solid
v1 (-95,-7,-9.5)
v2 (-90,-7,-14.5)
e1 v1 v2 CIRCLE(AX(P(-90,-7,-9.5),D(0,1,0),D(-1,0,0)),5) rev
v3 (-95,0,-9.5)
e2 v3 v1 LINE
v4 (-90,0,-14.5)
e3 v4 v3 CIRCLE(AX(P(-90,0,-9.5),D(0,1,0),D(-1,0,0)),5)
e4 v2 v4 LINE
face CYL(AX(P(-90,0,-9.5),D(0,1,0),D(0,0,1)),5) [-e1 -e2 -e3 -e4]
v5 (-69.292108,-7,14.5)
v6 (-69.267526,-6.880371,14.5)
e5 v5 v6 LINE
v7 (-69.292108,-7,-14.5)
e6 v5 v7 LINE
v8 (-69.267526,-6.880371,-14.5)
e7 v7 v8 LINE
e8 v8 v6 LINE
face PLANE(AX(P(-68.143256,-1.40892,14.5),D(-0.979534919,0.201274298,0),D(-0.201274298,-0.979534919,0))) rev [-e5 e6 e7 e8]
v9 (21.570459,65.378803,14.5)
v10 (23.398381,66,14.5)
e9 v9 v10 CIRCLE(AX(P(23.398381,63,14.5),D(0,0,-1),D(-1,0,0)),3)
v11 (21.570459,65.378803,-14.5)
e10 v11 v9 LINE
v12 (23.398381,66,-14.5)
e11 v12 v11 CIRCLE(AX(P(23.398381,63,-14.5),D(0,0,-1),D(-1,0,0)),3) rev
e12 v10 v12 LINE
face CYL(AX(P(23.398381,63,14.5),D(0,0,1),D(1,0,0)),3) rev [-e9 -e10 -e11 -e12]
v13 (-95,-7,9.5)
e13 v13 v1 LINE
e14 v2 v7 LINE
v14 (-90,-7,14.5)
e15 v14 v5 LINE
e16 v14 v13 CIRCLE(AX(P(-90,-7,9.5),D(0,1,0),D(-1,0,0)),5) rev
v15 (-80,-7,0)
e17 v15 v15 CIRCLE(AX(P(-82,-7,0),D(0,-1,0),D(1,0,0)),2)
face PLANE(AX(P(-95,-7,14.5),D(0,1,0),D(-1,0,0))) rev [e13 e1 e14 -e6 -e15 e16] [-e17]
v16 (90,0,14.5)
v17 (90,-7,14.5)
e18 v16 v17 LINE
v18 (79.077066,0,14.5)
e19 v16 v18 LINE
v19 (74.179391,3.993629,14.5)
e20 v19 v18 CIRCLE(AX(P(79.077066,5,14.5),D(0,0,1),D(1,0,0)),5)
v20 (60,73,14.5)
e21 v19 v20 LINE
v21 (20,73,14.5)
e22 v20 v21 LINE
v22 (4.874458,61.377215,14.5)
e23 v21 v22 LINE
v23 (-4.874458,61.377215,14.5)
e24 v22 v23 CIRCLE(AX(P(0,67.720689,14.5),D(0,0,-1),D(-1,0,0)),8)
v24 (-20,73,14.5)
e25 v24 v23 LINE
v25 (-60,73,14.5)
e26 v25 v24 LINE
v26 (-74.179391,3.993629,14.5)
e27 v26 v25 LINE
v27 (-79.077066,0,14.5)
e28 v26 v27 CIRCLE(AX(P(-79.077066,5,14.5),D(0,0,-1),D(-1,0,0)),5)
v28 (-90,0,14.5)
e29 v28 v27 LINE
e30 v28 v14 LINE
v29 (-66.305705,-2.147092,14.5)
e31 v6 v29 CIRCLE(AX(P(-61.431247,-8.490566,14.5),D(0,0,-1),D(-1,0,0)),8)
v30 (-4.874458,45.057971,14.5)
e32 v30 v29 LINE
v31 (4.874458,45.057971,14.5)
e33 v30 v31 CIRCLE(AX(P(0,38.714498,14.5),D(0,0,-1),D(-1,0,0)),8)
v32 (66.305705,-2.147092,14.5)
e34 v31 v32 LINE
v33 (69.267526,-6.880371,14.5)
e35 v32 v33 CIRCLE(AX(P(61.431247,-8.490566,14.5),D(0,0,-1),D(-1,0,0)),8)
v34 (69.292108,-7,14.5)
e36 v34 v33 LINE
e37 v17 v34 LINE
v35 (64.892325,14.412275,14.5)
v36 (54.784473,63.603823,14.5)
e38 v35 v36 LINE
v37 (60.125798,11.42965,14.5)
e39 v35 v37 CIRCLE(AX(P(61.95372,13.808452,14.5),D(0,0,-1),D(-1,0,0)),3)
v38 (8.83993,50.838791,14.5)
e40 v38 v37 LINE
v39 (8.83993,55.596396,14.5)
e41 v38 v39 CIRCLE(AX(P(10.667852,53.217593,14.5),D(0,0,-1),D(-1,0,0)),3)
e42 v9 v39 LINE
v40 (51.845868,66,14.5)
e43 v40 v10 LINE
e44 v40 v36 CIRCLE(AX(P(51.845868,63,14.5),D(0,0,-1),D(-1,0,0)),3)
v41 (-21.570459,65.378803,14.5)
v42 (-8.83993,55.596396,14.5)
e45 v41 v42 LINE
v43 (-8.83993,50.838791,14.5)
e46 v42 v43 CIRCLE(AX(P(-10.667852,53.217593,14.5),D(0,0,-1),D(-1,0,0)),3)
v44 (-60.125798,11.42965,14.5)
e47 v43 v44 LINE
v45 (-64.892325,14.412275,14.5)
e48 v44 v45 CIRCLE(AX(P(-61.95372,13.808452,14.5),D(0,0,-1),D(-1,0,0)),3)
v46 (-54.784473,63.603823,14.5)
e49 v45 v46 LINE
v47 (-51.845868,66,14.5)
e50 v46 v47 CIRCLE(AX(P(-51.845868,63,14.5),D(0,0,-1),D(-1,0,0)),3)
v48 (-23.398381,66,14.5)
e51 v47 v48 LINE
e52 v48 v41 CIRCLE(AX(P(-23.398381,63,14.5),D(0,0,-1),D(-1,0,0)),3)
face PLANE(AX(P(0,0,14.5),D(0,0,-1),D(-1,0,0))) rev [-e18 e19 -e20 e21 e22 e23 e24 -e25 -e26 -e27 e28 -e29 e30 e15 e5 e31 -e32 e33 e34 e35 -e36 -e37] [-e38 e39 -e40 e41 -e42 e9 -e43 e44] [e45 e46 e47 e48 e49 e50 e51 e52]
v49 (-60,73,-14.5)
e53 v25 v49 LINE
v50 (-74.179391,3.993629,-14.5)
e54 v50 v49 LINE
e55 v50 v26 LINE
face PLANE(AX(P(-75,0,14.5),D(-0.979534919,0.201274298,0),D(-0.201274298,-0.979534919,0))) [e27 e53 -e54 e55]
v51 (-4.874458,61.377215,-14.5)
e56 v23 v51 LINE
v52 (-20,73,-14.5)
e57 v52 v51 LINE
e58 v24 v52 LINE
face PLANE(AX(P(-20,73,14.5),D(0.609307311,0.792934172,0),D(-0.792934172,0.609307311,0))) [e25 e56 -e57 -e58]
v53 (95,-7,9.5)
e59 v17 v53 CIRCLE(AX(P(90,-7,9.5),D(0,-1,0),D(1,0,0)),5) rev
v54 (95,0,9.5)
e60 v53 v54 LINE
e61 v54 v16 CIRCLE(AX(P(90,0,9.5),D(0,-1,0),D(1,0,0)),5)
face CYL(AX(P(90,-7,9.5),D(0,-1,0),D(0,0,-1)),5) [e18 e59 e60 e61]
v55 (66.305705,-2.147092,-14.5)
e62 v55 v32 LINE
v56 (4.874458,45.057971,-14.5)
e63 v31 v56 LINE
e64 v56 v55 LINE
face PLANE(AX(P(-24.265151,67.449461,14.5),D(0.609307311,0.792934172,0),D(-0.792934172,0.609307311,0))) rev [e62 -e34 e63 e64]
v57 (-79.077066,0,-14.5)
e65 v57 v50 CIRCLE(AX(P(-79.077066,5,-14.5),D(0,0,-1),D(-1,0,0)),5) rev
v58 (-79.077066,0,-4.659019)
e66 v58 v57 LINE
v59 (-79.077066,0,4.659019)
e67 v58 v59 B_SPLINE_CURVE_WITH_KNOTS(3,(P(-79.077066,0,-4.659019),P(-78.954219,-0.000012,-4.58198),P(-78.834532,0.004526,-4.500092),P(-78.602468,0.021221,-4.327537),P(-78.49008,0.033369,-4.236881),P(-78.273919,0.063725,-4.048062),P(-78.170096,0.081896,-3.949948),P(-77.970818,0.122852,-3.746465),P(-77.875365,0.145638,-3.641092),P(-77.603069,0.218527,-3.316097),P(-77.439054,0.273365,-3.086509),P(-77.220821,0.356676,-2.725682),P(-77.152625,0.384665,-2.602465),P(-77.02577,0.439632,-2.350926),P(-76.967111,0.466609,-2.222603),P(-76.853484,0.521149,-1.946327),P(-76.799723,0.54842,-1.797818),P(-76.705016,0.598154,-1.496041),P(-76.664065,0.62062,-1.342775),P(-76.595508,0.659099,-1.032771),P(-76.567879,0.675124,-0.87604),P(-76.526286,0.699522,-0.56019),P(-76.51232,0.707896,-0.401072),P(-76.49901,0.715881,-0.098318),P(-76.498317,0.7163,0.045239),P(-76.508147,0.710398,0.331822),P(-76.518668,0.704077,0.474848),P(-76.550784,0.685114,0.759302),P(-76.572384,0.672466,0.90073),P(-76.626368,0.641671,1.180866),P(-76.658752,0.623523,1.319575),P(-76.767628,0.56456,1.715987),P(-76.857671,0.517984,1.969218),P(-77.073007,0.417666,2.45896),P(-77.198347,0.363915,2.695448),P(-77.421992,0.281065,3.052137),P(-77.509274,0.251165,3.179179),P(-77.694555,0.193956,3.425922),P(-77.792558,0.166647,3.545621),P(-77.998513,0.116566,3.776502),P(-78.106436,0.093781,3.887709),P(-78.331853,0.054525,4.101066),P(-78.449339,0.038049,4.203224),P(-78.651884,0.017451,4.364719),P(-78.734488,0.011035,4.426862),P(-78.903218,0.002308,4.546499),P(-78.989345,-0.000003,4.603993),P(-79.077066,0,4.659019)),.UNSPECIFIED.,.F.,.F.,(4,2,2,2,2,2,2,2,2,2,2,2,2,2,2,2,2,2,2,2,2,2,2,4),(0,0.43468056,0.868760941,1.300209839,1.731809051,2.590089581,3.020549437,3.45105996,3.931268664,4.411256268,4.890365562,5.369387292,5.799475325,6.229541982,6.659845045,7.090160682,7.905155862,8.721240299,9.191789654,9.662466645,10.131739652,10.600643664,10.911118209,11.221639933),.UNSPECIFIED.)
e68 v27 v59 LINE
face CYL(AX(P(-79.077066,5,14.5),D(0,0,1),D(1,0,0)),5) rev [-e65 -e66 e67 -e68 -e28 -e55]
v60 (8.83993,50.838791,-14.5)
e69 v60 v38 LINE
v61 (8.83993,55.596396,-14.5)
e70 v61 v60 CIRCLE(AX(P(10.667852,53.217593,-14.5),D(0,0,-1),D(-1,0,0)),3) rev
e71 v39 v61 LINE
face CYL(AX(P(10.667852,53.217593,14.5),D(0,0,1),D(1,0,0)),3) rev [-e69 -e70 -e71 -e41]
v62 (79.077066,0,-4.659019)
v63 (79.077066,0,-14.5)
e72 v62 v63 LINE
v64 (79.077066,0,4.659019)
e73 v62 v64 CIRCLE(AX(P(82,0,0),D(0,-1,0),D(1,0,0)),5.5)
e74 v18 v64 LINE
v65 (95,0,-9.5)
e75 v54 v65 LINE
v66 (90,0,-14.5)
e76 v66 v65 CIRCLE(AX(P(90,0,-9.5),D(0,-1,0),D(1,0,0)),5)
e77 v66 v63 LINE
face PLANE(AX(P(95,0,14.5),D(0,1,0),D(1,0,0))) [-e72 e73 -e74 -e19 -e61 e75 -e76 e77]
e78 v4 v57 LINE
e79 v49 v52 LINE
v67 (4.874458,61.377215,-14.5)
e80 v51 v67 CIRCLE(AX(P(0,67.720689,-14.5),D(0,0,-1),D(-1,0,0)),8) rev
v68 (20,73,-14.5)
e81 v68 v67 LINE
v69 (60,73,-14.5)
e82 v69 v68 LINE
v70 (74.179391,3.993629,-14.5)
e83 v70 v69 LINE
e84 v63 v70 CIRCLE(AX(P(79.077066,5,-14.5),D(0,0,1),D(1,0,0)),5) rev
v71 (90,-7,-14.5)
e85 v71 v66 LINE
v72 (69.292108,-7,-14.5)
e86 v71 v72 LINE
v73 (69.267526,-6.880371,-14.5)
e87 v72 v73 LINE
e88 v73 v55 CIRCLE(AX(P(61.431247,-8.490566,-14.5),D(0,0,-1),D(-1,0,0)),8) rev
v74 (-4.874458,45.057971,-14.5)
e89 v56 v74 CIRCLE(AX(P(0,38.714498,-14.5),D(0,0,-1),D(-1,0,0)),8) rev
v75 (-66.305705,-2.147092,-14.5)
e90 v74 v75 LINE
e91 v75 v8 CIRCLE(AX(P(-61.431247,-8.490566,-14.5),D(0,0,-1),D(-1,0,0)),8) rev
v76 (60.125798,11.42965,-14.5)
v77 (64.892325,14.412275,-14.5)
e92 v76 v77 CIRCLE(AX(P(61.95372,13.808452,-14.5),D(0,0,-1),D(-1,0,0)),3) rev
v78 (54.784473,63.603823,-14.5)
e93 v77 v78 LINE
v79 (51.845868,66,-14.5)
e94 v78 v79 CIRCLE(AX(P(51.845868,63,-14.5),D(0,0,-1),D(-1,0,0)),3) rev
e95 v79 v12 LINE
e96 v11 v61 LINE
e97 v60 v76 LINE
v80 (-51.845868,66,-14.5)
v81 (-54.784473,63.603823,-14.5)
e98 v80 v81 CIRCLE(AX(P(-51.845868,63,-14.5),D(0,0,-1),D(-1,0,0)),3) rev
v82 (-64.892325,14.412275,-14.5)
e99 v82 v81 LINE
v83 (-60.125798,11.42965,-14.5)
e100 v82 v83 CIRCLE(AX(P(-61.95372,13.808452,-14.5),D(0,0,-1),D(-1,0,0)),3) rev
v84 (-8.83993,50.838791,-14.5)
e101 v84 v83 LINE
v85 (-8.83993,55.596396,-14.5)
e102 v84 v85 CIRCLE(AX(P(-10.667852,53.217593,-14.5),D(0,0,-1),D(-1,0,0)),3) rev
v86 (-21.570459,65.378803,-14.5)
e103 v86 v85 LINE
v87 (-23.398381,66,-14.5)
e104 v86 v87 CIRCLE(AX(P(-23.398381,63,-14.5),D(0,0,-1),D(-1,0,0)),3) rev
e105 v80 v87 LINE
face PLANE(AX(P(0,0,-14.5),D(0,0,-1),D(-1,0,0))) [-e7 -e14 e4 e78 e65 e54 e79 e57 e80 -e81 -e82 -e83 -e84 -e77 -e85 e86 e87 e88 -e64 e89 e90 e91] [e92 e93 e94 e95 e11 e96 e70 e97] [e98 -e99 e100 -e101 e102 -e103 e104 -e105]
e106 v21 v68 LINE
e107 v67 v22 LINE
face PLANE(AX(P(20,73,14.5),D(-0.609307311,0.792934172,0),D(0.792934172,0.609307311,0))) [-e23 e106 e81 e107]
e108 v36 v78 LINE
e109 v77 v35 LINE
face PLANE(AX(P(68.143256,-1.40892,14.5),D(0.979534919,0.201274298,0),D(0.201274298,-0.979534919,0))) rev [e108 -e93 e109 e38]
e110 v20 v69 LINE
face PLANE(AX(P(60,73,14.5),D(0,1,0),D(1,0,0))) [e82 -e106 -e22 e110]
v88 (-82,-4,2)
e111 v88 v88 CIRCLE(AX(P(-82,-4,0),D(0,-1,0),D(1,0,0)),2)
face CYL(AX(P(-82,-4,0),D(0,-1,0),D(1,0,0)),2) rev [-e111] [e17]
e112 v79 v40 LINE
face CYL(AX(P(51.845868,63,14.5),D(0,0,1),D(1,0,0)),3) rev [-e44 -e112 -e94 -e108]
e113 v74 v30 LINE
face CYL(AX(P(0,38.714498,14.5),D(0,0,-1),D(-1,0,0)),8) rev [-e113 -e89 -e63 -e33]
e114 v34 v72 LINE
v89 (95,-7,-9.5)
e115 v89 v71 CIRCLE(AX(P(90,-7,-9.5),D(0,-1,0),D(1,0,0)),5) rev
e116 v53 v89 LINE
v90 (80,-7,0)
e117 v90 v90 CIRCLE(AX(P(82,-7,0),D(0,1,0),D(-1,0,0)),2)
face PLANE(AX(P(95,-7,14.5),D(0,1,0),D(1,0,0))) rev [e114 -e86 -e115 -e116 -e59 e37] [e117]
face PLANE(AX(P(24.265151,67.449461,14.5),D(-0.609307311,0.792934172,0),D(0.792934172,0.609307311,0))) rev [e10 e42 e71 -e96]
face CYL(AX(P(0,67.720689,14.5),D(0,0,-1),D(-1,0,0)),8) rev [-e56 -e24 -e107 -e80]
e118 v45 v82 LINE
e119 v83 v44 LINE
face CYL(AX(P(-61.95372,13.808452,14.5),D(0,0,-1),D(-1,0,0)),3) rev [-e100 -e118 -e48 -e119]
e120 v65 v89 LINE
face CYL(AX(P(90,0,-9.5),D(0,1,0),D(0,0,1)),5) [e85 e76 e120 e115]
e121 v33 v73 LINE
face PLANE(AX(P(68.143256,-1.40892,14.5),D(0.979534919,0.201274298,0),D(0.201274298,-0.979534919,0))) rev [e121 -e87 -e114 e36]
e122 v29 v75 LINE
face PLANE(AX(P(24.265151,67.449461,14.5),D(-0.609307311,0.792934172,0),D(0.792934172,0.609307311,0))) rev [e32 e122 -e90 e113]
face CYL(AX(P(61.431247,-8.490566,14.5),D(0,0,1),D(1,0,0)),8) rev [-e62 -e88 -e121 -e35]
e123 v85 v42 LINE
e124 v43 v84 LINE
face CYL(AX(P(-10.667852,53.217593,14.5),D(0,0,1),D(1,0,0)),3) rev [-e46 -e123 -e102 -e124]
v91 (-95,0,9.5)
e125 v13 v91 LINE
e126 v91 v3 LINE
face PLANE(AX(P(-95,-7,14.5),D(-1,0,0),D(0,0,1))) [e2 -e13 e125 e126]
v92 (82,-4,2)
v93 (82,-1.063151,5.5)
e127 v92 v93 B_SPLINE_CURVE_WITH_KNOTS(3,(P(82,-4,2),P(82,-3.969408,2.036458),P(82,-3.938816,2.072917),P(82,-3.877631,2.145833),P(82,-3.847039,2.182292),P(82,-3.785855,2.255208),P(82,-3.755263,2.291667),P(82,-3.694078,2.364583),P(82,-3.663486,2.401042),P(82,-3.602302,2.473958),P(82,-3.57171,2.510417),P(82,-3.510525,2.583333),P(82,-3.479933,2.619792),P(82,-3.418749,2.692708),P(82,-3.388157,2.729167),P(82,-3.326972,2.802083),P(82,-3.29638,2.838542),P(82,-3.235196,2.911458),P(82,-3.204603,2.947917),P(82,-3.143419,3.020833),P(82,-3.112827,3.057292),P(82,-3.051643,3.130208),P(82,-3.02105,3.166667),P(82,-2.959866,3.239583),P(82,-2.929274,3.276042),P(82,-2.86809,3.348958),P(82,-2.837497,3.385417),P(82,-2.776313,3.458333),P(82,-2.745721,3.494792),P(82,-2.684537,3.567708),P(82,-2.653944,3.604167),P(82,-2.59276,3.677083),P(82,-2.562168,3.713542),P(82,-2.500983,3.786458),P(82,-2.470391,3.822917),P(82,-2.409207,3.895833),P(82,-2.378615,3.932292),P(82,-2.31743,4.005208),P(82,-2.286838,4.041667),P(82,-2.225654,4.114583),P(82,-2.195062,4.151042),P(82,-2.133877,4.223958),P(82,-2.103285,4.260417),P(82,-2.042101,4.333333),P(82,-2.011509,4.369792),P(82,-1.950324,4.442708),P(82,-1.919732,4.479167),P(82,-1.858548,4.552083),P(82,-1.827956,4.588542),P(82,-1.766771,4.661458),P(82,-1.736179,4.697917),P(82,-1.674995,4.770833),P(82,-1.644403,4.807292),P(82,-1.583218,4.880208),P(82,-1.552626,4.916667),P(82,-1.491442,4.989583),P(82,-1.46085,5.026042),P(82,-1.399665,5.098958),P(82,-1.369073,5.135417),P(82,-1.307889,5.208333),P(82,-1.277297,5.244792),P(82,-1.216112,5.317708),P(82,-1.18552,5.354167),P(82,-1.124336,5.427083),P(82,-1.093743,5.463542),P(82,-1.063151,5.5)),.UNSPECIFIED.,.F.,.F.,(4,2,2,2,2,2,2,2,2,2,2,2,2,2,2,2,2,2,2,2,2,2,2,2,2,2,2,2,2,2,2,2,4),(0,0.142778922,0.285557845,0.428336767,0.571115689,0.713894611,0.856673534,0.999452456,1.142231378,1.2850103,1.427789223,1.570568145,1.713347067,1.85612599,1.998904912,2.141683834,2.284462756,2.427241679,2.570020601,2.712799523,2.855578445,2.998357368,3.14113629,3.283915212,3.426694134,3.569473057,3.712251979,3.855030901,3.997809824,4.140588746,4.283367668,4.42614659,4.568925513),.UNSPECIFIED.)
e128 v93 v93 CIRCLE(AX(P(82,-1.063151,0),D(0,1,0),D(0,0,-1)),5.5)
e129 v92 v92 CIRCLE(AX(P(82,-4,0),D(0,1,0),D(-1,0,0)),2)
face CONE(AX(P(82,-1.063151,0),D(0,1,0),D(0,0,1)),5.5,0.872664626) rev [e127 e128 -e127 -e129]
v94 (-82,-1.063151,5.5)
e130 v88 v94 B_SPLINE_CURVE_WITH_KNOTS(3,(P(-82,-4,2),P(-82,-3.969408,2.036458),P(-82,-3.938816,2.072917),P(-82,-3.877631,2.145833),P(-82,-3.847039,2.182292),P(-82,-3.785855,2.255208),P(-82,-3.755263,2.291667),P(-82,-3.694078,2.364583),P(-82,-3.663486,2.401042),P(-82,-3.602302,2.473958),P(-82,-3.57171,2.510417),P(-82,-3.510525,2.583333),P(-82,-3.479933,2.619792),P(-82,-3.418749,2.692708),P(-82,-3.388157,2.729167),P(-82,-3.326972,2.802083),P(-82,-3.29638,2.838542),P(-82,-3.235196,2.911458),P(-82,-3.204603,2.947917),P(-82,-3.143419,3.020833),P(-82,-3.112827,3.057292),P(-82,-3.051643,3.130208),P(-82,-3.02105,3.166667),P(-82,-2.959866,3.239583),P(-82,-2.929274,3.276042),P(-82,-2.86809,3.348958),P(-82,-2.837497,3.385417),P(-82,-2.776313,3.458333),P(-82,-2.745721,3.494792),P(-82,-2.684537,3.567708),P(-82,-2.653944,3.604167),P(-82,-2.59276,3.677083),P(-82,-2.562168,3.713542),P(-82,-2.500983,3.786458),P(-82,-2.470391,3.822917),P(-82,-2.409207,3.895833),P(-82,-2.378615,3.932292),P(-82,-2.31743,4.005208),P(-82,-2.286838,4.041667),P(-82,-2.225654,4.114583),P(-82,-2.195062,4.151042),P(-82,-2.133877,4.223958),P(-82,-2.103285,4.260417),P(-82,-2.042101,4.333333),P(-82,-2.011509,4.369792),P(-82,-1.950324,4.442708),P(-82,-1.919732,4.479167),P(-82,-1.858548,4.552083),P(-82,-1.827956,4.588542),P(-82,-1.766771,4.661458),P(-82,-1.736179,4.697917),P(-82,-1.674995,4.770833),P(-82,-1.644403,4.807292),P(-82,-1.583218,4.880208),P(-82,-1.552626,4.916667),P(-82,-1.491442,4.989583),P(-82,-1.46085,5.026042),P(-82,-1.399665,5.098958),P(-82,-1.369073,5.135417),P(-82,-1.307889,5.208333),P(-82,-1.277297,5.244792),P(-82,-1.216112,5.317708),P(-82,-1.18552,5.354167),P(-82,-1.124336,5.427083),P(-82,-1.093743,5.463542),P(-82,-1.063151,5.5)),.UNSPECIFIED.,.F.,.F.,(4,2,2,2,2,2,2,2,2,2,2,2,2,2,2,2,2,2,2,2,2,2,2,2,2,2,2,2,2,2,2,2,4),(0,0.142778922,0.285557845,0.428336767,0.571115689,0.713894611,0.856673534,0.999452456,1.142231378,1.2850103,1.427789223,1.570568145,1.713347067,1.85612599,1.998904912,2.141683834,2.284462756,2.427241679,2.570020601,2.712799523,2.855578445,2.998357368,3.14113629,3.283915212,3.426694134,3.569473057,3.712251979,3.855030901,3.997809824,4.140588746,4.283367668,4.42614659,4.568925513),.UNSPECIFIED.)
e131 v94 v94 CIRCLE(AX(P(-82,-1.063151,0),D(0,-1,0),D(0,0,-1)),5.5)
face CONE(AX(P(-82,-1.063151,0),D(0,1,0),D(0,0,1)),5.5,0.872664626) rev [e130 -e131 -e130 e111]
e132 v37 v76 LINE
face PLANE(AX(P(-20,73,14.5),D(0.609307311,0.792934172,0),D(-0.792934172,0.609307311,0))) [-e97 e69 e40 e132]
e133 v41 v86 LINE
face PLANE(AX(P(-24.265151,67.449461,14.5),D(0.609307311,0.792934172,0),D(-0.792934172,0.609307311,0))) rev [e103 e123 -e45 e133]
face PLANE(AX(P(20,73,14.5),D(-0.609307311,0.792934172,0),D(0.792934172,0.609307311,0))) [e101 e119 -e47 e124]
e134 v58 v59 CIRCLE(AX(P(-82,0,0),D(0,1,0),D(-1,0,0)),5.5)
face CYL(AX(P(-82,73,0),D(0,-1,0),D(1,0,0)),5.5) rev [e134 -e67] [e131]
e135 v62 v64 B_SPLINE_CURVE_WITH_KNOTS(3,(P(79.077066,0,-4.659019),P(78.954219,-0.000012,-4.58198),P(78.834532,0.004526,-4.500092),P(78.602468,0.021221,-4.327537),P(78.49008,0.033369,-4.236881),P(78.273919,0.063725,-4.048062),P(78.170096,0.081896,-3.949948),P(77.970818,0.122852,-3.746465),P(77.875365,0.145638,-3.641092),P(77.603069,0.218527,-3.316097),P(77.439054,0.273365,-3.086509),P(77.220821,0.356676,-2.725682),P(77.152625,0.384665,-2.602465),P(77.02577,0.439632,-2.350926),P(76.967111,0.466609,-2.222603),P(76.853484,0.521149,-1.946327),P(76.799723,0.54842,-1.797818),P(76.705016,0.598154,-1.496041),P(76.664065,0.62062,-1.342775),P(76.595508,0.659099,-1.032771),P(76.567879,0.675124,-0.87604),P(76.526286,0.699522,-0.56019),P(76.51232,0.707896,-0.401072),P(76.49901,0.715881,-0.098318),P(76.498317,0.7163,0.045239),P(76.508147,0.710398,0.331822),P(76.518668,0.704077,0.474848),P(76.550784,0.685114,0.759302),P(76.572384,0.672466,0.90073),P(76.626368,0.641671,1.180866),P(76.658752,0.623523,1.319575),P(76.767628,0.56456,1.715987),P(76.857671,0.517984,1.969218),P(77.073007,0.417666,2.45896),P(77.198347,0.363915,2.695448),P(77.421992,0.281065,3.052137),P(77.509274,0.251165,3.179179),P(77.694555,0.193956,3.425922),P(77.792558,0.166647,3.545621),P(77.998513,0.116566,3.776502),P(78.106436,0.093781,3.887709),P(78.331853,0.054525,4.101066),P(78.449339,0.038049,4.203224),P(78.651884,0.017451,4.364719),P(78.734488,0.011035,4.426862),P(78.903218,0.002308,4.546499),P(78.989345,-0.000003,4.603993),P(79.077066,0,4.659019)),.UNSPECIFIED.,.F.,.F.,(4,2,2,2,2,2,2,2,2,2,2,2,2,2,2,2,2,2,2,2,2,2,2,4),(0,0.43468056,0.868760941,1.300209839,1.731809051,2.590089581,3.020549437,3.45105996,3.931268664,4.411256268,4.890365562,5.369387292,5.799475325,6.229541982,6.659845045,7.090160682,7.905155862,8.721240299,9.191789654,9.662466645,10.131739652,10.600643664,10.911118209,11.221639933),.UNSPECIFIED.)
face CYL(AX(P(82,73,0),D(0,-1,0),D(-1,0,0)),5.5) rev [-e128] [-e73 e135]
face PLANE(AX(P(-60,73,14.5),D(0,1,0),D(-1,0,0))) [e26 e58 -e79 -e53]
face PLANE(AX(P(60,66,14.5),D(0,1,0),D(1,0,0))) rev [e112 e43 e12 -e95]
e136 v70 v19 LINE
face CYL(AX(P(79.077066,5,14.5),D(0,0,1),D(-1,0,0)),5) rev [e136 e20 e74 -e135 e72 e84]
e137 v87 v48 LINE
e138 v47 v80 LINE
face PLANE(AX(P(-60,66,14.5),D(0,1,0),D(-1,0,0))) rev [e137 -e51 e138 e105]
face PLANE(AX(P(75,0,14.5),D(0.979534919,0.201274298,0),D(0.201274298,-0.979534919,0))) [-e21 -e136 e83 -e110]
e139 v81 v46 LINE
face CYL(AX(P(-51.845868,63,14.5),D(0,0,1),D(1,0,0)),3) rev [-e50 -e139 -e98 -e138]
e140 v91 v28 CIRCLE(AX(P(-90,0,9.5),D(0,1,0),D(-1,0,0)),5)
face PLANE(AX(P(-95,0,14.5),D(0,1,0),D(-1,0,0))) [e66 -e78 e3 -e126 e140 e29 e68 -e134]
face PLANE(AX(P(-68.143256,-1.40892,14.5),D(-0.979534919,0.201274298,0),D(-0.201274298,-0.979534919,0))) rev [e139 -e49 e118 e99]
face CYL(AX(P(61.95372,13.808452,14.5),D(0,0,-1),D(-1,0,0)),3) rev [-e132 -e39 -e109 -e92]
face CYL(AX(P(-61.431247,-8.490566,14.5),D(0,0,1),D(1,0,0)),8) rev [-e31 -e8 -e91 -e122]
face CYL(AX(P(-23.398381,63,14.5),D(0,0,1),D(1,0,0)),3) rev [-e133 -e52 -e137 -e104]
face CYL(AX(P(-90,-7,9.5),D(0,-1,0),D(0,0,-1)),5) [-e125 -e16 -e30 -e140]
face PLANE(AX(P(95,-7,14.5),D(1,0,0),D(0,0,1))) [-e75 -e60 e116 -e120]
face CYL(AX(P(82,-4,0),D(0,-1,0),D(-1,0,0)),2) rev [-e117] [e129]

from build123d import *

# Parameters (mm, degrees)
EXTRU_MINCE1_DEPTH      = 14.5
CONG_1_R                = 5
CONG_2_R                = 5
ESQUISSE4_R             = 2
ENL_V_MAT_EXTRU_1_DEPTH = 3
ESQUISSE5_R             = 5.5
ENL_V_MAT_EXTRU_2_DEPTH = 124.143209313
CHANFREIN1_SIZE2        = 3.5
CHANFREIN1_SIZE         = 2.936848709
CONG_3_R                = 8
CONG_4_R                = 3


with BuildPart() as part:
    # Esquisse1 → Extru.-Mince1 (new, symmetric)
    with BuildSketch(Plane.XY):
        Polygon((-95, 0), (-75, 0), (-60, 73), (-20, 73), (75, 0), (70.734848823, -5.550539203), (-22.378866577, 66), (-54.292107606, 66), (-69.292107606, -7), (-95, -7), align=None)
    extrude(amount=EXTRU_MINCE1_DEPTH, both=True)

    # Congé1
    cong_1_edges = [part.edges().sort_by_distance(p)[0] for p in [
        (-95, -3.5, 14.5),
        (-95, -3.5, -14.5),
    ]]
    fillet(cong_1_edges, radius=CONG_1_R)

    # Congé2
    cong_2_edges = [part.edges().sort_by_distance(p)[0] for p in [
        (-75, 0, 0),
    ]]
    fillet(cong_2_edges, radius=CONG_2_R)

    # Esquisse4 → Enlèv. mat.-Extru.1 (cut)
    with BuildSketch(Plane.XZ.offset(7)):
        with Locations((-82, 0)):
            Circle(ESQUISSE4_R)
    extrude(amount=-ENL_V_MAT_EXTRU_1_DEPTH, mode=Mode.SUBTRACT)

    # Esquisse5 → Enlèv. mat.-Extru.2 (cut, through all)
    with BuildSketch(Plane.XZ.offset(4)):
        with Locations((-82, 0)):
            Circle(ESQUISSE5_R)
    extrude(amount=-ENL_V_MAT_EXTRU_2_DEPTH, mode=Mode.SUBTRACT)

    # Chanfrein1
    chanfrein1_edges = [part.edges().sort_by_distance(p)[0] for p in [
        (-87.5, -4, 0),
    ]]
    chanfrein1_side = [part.faces().sort_by_distance(p)[0] for p in [
        (-87.5, -3.941263026, 0),
    ]]
    chamfer(chanfrein1_edges, length=CHANFREIN1_SIZE - 0.0001, length2=CHANFREIN1_SIZE2 - 0.0001, reference=chanfrein1_side[0])  # a hair under: the kernel refuses the full size

    # Symétrie1: part across plane


with BuildPart() as part_1:
    add(part.part)
    add(part.part.mirror(Plane(origin=(0, 0, 0), x_dir=(0, 0, 1), z_dir=(1, 0, 0))))

    # Congé3
    cong_3_edges = [part_1.edges().sort_by_distance(p)[0] for p in [
        (0, 48.803607788, 0),
        (-68.667915266, -3.962263942, 0),
        (0, 57.631578947, 0),
        (68.667915266, -3.962263942, 0),
    ]]
    fillet(cong_3_edges, radius=CONG_3_R)

    # Congé4
    cong_4_edges = [part_1.edges().sort_by_distance(p)[0] for p in [
        (-22.378866577, 66, 0),
        (-54.292107606, 66, 0),
        (5.744227809, 53.217593368, 0),
        (-5.744227809, 53.217593368, 0),
        (66.513829837, 6.520951809, 0),
        (-66.513829837, 6.520951809, 0),
        (54.292107606, 66, 0),
        (22.378866577, 66, 0),
    ]]
    fillet(cong_4_edges, radius=CONG_4_R)


solid = part_1.part
